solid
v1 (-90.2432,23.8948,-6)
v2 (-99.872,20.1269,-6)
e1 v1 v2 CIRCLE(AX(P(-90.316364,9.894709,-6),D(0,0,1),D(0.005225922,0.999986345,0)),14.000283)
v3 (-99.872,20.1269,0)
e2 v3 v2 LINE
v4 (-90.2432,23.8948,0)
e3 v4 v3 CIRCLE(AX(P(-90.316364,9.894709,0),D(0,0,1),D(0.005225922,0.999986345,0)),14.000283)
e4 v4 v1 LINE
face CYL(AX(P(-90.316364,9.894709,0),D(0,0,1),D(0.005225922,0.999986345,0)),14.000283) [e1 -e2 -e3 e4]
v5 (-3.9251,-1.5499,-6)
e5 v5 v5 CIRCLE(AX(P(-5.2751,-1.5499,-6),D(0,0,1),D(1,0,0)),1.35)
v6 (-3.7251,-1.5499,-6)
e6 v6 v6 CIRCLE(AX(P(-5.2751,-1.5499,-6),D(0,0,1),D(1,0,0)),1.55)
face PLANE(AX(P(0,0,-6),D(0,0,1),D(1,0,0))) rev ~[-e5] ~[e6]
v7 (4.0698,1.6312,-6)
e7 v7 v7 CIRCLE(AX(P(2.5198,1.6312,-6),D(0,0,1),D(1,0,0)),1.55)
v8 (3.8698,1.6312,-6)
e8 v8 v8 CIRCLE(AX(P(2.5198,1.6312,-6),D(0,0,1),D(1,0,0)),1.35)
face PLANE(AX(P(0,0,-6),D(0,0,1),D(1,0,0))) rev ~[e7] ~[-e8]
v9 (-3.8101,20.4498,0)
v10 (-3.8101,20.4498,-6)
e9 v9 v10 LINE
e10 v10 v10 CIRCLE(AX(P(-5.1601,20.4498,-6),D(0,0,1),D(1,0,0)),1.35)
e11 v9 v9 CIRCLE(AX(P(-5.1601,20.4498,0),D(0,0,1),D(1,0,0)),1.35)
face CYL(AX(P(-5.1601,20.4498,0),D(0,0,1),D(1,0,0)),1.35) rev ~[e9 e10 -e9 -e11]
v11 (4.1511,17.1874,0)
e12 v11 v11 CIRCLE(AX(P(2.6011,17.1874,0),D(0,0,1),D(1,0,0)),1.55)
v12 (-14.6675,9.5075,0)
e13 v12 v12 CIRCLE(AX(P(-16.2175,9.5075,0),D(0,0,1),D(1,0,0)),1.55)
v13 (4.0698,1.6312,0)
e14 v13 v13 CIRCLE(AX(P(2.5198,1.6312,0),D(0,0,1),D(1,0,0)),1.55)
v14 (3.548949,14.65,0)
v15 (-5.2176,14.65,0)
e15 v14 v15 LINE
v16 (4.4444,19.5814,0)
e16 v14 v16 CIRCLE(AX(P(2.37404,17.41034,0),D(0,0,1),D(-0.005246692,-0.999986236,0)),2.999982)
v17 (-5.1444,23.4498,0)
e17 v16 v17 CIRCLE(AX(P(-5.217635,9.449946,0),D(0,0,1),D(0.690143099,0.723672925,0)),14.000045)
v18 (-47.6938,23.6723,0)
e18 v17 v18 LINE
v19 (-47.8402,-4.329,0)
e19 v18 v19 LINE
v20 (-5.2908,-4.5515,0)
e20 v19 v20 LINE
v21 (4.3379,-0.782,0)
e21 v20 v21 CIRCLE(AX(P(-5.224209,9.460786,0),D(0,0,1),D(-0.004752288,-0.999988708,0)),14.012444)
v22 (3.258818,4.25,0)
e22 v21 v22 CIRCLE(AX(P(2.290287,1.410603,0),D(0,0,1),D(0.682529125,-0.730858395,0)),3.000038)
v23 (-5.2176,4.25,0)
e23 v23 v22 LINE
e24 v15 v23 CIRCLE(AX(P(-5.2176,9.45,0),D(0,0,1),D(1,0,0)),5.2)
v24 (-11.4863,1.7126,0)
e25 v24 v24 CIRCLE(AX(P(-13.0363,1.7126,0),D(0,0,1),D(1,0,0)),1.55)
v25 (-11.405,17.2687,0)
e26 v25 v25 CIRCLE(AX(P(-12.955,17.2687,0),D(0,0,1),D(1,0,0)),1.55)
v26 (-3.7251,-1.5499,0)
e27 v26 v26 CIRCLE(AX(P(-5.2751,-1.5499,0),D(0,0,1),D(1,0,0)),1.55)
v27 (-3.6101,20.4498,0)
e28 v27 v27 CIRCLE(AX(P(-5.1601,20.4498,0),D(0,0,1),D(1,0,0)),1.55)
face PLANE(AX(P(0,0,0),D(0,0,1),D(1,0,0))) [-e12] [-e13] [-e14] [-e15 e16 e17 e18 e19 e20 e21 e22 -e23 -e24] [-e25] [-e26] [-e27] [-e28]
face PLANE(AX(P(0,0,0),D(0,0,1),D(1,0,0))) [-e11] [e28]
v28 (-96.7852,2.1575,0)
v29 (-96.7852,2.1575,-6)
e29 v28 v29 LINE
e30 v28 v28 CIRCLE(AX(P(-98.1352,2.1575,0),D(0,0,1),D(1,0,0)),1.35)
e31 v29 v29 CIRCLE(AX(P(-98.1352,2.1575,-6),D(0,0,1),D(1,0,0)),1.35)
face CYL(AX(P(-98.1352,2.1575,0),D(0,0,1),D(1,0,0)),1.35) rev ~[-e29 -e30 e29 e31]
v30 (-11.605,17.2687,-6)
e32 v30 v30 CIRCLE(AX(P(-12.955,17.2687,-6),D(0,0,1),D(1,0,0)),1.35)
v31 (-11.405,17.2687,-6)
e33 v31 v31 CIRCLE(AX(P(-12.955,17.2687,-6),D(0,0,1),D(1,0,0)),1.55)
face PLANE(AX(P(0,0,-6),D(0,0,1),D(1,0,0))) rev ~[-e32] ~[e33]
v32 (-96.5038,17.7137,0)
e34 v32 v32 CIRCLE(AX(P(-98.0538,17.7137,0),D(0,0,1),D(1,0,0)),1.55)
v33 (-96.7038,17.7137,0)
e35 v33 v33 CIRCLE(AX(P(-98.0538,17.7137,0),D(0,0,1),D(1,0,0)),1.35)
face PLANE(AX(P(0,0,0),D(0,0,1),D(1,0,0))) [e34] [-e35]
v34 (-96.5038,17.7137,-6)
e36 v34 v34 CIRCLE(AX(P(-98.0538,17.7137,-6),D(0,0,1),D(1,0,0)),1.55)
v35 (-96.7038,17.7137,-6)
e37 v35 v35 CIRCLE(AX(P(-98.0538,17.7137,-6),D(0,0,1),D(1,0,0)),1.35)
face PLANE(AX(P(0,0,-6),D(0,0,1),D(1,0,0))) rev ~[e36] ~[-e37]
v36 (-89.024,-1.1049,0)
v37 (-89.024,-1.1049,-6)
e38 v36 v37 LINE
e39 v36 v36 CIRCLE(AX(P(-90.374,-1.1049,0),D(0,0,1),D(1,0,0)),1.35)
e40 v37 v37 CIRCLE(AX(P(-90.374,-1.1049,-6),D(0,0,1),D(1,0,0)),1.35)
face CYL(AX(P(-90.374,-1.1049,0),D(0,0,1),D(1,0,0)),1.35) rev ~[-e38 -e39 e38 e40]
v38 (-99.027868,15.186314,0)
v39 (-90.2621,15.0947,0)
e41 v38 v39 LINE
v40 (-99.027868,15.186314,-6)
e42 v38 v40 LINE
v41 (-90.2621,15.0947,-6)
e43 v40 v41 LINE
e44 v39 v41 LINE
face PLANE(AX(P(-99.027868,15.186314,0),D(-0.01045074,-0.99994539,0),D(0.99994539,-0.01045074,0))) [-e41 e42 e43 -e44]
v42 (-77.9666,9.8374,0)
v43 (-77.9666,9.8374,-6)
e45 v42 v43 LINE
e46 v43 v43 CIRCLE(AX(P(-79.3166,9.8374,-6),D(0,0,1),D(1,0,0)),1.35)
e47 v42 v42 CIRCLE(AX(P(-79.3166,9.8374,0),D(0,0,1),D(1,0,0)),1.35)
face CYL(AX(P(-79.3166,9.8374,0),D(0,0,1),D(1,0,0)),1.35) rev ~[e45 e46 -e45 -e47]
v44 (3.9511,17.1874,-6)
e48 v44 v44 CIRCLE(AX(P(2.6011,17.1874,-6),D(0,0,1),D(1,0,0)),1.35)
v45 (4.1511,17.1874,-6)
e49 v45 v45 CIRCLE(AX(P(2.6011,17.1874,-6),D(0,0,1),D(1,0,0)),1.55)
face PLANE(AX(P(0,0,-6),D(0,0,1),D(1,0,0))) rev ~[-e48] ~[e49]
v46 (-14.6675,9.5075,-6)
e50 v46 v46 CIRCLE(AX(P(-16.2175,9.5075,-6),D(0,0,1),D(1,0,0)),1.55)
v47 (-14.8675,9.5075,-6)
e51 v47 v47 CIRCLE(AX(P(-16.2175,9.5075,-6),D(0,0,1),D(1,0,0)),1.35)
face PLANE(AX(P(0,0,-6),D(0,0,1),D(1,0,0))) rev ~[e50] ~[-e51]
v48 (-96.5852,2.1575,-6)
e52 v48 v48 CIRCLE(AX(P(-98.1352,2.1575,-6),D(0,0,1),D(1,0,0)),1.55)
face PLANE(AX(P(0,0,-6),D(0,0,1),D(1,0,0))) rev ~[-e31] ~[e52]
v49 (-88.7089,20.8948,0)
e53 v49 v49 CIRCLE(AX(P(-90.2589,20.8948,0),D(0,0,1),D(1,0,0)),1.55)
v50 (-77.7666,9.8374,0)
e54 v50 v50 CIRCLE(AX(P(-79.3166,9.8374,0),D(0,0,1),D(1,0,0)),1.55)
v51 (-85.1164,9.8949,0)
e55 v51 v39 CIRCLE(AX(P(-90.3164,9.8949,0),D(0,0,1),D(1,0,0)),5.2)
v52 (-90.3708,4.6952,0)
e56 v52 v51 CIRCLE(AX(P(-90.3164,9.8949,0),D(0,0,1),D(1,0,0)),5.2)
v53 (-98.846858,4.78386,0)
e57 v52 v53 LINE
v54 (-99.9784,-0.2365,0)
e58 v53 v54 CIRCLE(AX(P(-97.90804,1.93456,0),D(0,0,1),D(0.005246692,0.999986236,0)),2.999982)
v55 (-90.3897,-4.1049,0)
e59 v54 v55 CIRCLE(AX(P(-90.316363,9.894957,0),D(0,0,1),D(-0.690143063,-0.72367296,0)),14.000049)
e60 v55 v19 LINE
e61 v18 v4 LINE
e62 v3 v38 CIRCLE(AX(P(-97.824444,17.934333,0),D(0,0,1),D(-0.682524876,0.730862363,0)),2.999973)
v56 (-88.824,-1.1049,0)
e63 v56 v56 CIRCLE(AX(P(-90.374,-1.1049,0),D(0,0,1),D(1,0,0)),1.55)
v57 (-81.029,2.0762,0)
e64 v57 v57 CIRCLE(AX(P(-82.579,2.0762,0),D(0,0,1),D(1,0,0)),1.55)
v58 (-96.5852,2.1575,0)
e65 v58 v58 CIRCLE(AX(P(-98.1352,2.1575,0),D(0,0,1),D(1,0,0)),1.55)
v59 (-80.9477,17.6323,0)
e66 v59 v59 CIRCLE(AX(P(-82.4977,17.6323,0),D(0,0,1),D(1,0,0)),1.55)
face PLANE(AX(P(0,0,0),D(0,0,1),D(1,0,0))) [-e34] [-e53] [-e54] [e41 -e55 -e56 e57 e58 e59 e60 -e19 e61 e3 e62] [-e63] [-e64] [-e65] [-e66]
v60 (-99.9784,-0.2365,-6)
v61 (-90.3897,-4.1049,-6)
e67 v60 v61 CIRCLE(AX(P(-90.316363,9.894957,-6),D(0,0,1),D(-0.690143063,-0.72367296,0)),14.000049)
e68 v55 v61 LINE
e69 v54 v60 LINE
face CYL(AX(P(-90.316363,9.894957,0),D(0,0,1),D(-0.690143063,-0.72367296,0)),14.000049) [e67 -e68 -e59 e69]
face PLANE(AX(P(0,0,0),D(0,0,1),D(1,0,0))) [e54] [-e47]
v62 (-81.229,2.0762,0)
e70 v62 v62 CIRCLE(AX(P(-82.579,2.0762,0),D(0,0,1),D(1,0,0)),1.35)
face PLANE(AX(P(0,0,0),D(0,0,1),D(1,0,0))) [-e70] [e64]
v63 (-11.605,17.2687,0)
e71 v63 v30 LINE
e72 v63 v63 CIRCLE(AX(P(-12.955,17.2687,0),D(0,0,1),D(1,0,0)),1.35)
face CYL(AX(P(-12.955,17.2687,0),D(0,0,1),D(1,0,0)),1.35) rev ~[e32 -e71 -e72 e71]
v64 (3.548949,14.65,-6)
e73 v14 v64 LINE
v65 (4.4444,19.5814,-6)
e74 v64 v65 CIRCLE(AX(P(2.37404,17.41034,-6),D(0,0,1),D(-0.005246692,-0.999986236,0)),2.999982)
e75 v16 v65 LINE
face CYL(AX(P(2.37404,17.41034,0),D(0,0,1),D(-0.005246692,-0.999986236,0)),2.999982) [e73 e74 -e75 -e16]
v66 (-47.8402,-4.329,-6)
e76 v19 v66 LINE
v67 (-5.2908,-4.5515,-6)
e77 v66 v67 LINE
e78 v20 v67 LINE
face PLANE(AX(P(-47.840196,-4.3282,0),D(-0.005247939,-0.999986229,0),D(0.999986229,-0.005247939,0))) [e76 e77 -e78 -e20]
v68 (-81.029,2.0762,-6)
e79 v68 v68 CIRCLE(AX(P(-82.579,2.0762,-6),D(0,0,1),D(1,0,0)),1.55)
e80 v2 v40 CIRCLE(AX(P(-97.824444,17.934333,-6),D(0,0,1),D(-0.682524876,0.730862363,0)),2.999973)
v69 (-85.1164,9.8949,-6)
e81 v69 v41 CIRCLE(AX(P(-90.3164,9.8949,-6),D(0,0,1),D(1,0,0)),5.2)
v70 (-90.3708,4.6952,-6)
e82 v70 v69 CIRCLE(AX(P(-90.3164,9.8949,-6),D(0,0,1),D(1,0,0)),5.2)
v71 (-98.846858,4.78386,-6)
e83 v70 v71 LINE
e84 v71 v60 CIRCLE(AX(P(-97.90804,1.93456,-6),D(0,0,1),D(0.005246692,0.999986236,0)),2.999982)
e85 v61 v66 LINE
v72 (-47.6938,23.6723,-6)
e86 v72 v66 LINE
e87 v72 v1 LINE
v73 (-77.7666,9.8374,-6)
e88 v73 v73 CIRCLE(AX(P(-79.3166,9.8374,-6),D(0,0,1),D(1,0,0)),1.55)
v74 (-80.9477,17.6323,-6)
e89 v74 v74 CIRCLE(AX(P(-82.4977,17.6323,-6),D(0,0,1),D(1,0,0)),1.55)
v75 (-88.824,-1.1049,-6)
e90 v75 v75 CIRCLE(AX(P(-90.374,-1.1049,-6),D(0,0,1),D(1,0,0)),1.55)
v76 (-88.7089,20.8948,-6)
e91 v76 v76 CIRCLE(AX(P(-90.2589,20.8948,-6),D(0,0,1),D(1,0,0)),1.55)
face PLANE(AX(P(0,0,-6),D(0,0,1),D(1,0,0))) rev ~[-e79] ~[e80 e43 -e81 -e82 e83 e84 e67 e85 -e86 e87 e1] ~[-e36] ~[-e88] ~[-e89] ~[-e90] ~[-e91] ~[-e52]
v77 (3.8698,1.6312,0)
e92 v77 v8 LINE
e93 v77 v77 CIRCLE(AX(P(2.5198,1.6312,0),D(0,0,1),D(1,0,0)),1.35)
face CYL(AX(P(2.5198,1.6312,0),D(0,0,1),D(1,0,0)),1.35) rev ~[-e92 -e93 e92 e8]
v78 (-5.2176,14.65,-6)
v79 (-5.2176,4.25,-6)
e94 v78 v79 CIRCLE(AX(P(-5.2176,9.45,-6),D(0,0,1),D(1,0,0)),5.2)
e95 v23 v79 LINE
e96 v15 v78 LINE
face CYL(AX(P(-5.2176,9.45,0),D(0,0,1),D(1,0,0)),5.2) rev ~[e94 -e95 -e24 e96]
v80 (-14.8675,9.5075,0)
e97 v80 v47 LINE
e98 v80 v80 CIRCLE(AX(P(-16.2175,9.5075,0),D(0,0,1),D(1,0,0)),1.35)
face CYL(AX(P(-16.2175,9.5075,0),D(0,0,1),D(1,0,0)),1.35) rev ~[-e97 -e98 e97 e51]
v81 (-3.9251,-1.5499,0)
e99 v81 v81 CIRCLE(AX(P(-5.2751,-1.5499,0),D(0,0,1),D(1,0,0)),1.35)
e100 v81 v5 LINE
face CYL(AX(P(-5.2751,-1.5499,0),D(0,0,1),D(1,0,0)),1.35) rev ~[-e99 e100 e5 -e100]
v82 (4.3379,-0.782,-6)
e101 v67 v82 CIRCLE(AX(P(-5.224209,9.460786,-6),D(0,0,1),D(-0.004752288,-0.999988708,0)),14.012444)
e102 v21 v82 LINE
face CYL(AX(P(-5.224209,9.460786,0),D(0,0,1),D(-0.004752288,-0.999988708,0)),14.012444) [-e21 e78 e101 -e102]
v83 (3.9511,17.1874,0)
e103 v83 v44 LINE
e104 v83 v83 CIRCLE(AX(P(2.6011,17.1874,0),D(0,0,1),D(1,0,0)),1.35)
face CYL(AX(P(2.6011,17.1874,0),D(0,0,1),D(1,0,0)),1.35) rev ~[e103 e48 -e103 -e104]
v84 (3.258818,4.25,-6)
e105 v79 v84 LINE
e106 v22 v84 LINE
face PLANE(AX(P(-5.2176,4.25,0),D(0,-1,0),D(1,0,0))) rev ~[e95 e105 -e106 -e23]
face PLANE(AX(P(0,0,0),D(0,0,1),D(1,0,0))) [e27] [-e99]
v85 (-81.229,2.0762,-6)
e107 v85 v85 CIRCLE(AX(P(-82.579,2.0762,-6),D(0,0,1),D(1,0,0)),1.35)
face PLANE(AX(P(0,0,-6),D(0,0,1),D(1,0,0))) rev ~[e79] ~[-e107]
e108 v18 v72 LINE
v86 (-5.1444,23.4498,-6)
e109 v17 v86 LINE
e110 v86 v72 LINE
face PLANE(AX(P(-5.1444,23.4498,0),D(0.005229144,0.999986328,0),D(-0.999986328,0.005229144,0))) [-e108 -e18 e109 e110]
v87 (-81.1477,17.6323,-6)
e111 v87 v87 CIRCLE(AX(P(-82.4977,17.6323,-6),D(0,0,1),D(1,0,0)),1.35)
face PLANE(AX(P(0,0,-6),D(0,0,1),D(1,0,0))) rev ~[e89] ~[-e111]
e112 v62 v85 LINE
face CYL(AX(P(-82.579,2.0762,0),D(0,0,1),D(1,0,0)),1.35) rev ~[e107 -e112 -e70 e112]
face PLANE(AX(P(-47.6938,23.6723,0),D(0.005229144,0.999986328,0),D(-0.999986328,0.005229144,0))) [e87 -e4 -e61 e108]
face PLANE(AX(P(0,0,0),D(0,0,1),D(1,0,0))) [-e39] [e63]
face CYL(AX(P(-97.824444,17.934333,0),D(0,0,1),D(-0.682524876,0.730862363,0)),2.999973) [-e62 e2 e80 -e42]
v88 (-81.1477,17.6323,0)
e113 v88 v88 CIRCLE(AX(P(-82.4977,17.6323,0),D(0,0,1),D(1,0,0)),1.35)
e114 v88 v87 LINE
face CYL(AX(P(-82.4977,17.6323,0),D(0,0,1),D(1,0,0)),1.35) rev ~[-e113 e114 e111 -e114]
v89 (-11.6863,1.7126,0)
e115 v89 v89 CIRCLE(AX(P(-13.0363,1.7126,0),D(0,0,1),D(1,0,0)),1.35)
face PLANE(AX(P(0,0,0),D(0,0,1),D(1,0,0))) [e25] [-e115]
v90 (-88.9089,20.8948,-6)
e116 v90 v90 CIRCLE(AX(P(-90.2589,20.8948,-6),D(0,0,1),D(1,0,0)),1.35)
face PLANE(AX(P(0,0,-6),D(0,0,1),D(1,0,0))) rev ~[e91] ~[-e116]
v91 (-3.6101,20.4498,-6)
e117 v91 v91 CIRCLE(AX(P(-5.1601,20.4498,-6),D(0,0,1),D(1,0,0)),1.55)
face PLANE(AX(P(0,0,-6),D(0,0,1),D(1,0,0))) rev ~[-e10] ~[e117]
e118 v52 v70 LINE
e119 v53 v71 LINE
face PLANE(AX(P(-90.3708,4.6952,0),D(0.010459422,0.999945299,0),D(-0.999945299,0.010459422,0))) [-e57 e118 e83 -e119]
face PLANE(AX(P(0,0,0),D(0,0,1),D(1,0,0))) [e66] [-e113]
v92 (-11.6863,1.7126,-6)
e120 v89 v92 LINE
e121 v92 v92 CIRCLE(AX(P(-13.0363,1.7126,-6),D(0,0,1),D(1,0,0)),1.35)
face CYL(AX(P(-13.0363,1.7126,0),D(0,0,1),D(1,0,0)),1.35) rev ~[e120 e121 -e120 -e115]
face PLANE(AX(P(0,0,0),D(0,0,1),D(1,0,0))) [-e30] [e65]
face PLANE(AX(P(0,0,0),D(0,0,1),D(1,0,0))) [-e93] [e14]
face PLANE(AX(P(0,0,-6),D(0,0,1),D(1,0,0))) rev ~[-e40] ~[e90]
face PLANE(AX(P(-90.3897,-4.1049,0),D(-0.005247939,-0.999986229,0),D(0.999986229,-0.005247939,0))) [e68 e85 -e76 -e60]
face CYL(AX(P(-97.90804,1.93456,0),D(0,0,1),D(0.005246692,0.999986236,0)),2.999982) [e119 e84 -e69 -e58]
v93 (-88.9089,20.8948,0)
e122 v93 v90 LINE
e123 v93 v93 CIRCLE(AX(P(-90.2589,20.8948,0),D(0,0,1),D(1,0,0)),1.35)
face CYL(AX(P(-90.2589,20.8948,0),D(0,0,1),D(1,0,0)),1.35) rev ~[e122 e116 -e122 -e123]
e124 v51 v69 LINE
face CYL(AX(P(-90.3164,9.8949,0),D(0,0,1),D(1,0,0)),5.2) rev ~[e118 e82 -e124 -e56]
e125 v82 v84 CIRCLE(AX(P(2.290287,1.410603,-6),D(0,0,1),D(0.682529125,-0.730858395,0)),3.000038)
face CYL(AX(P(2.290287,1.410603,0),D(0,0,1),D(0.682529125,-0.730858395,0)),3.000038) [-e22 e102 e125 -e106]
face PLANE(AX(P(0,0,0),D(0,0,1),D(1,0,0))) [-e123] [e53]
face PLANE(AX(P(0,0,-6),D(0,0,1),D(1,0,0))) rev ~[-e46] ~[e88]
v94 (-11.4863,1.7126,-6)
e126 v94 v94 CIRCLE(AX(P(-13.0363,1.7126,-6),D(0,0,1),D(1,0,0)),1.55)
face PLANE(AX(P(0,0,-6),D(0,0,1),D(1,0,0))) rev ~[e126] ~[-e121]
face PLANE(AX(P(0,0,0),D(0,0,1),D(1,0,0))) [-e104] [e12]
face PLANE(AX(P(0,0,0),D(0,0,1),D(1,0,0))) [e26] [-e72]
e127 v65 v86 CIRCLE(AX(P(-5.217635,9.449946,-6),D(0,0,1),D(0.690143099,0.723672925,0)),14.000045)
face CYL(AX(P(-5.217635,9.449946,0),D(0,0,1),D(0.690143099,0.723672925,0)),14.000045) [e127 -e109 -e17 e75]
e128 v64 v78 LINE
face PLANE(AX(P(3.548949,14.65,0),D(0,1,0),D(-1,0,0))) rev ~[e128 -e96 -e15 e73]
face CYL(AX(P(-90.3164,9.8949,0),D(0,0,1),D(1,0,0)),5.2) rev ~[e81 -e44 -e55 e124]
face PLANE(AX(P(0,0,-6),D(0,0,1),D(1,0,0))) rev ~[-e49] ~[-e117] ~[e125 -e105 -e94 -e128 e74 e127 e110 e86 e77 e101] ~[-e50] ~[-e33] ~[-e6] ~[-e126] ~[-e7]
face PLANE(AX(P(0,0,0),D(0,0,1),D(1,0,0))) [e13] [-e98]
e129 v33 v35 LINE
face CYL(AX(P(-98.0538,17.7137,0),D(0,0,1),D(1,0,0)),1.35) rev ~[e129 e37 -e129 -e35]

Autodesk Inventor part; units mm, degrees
ref_plane "YZ Plane" through (0, 0, 0) normal (1, 0, 0) x (0, 1, 0)
ref_plane "XZ Plane" through (0, 0, 0) normal (0, 1, 0) x (-1, 0, 0)
ref_plane "XY Plane" through (0, 0, 0) normal (0, 0, 1) x (1, 0, 0)
ref_plane "작업 평면1" through (0, 0, 0) normal (0, 0, 1) x (1, 0, 0)
sketch "스케치1" plane through (0, 0, 0) normal (0, 0, 1) x (1, 0, 0)
  circle A0 centre (-5.2751, -1.5499) radius 1.55 projected
  circle A1 centre (2.5198, 1.6312) radius 1.55 projected
  circle A2 centre (-16.2175, 9.5075) radius 1.55 projected
  circle A3 centre (-13.0363, 1.7126) radius 1.55 projected
  circle A4 centre (-12.955, 17.2687) radius 1.55 projected
  circle A5 centre (-90.374, -1.1049) radius 1.55 projected
  circle A6 centre (-98.1352, 2.1575) radius 1.55 projected
  circle A7 centre (-79.3166, 9.8374) radius 1.55 projected
  circle A8 centre (-82.4977, 17.6323) radius 1.55 projected
  circle A9 centre (-82.579, 2.0762) radius 1.55 projected
  circle A10 centre (-98.0538, 17.7137) radius 1.55 projected
  circle A11 centre (-90.2589, 20.8948) radius 1.55 projected
  circle A12 centre (2.6011, 17.1874) radius 1.55 projected
  circle A13 centre (-5.1601, 20.4498) radius 1.55 projected
  arc A14 (4.3379, -0.782) -> (2.306, 4.4106) centre (2.2903, 1.4106) ccw projected
  line L0 (2.306, 4.4106) -> (-5.2438, 4.45) projected
  arc A15 (-5.1915, 14.4499) -> (-5.2438, 4.45) centre (-5.2176, 9.45) ccw projected
  line L1 (-5.1915, 14.4499) -> (2.3583, 14.4104) projected
  arc A16 (2.3583, 14.4104) -> (4.4444, 19.5814) centre (2.374, 17.4104) ccw projected
  arc A17 (4.4444, 19.5814) -> (-5.1444, 23.4498) centre (-5.2176, 9.45) ccw projected
  line L2 (-5.1444, 23.4498) -> (-90.2432, 23.8948) projected
  arc A18 (-90.2432, 23.8948) -> (-99.872, 20.1269) centre (-90.3164, 9.8949) ccw projected
  arc A19 (-99.872, 20.1269) -> (-97.84, 14.9344) centre (-97.8243, 17.9343) ccw projected
  line L3 (-97.84, 14.9344) -> (-90.2903, 14.8949) projected
  arc A20 (-90.3426, 4.895) -> (-90.2903, 14.8949) centre (-90.3164, 9.8949) ccw projected
  line L4 (-90.3426, 4.895) -> (-97.8923, 4.9345) projected
  arc A21 (-97.8923, 4.9345) -> (-99.9784, -0.2365) centre (-97.908, 1.9345) ccw projected
  arc A22 (-99.9784, -0.2365) -> (-90.3897, -4.1049) centre (-90.3164, 9.8949) ccw projected
  line L5 (-90.3897, -4.1049) -> (-90.3897, -4.1065) projected
  line L6 (-90.3897, -4.1065) -> (-5.2908, -4.5515) projected
  line L7 (-5.2908, -4.5515) -> (-5.2908, -4.5498) projected
  arc A23 (-5.2908, -4.5498) -> (4.3379, -0.782) centre (-5.2176, 9.45) ccw projected
  circle A24 centre (-5.2176, 9.45) radius 1.5 projected
  circle A25 centre (-5.2176, 9.45) radius 5.2
  line L8 (-5.2176, 4.25) -> (6.1788, 4.25)
  line L9 (6.1788, 4.25) -> (6.1788, 14.65)
  line L10 (6.1788, 14.65) -> (-5.2176, 14.65)
  line L11 (-5.2176, 14.65) -> (-5.2176, 4.25)
  circle A26 centre (-12.955, 17.2687) radius 1.35
  circle A27 centre (-16.2175, 9.5075) radius 1.35
  circle A28 centre (-13.0363, 1.7126) radius 1.35
  circle A29 centre (-5.2751, -1.5499) radius 1.35
  circle A30 centre (2.5198, 1.6312) radius 1.35
  circle A31 centre (5.7822, 9.3924) radius 1.35
  circle A32 centre (2.6011, 17.1874) radius 1.35
  circle A33 centre (-5.1601, 20.4498) radius 1.35
  line L12 (-47.6938, 23.6723) -> (-47.8402, -4.329)
  circle A34 centre (-90.374, -1.1049) radius 1.55
  circle A35 centre (-98.1352, 2.1575) radius 1.55
  circle A36 centre (-79.3166, 9.8374) radius 1.55
  circle A37 centre (-82.579, 2.0762) radius 1.55
  circle A38 centre (-82.4977, 17.6323) radius 1.55
  circle A39 centre (-98.0538, 17.7137) radius 1.55
  circle A40 centre (-90.2589, 20.8948) radius 1.55
  arc A41 (-97.8923, 4.9345) -> (-99.9784, -0.2365) centre (-97.908, 1.9345) ccw
  line L13 (-97.8923, 4.9345) -> (-90.3426, 4.895)
  arc A42 (-90.3426, 4.895) -> (-90.2903, 14.8949) centre (-90.3164, 9.8949) ccw
  line L14 (-90.2903, 14.8949) -> (-97.84, 14.9344)
  arc A43 (-99.872, 20.1269) -> (-97.84, 14.9344) centre (-97.8243, 17.9343) ccw
  arc A44 (-90.2432, 23.8948) -> (-99.872, 20.1269) centre (-90.3164, 9.8949) ccw
  line L15 (-90.3897, -4.1065) -> (-90.3897, -4.1049)
  arc A45 (-99.9784, -0.2365) -> (-90.3897, -4.1049) centre (-90.3164, 9.8949) ccw
  circle A46 centre (-90.3164, 9.8949) radius 1.5
  circle A47 centre (-90.3164, 9.8949) radius 5.2
  line L16 (-90.3708, 4.6952) -> (-101.7666, 4.8144)
  line L17 (-101.7666, 4.8144) -> (-101.6578, 15.2138)
  line L18 (-101.6578, 15.2138) -> (-90.2621, 15.0947)
  line L19 (-90.2621, 15.0947) -> (-90.3708, 4.6952)
  circle A48 centre (-82.4977, 17.6323) radius 1.35
  circle A49 centre (-79.3166, 9.8374) radius 1.35
  circle A50 centre (-82.579, 2.0762) radius 1.35
  circle A51 centre (-90.374, -1.1049) radius 1.35
  circle A52 centre (-98.1352, 2.1575) radius 1.35
  circle A53 centre (-101.3163, 9.9525) radius 1.35
  circle A54 centre (-98.0538, 17.7137) radius 1.35
  circle A55 centre (-90.2589, 20.8948) radius 1.35
  point P0 (3.2588, 4.25)
  point P1 (-5.2176, 14.65)
  point P2 (3.5487, 14.65)
  point P3 (-99.0279, 15.1863)
  point P4 (-98.8468, 4.7839)
  dimension "d3" = 0.2
  dimension "d6" = 360
extrude "돌출1" add sketch "스케치1" against normal blind 6 contours A0 | A1 | A2 | A3 | A4 | A5 | A6 | A7 | A8 | A9 | A10 | A11 | A12 | A13 | A23 L6 L12 L2 A17 A16 L10 A25 L8 A14 | L6 A22 A21 L16 A47 L18 A19 A18 L2 L12
properties part number "calf" material "PMMA 플라스틱"
